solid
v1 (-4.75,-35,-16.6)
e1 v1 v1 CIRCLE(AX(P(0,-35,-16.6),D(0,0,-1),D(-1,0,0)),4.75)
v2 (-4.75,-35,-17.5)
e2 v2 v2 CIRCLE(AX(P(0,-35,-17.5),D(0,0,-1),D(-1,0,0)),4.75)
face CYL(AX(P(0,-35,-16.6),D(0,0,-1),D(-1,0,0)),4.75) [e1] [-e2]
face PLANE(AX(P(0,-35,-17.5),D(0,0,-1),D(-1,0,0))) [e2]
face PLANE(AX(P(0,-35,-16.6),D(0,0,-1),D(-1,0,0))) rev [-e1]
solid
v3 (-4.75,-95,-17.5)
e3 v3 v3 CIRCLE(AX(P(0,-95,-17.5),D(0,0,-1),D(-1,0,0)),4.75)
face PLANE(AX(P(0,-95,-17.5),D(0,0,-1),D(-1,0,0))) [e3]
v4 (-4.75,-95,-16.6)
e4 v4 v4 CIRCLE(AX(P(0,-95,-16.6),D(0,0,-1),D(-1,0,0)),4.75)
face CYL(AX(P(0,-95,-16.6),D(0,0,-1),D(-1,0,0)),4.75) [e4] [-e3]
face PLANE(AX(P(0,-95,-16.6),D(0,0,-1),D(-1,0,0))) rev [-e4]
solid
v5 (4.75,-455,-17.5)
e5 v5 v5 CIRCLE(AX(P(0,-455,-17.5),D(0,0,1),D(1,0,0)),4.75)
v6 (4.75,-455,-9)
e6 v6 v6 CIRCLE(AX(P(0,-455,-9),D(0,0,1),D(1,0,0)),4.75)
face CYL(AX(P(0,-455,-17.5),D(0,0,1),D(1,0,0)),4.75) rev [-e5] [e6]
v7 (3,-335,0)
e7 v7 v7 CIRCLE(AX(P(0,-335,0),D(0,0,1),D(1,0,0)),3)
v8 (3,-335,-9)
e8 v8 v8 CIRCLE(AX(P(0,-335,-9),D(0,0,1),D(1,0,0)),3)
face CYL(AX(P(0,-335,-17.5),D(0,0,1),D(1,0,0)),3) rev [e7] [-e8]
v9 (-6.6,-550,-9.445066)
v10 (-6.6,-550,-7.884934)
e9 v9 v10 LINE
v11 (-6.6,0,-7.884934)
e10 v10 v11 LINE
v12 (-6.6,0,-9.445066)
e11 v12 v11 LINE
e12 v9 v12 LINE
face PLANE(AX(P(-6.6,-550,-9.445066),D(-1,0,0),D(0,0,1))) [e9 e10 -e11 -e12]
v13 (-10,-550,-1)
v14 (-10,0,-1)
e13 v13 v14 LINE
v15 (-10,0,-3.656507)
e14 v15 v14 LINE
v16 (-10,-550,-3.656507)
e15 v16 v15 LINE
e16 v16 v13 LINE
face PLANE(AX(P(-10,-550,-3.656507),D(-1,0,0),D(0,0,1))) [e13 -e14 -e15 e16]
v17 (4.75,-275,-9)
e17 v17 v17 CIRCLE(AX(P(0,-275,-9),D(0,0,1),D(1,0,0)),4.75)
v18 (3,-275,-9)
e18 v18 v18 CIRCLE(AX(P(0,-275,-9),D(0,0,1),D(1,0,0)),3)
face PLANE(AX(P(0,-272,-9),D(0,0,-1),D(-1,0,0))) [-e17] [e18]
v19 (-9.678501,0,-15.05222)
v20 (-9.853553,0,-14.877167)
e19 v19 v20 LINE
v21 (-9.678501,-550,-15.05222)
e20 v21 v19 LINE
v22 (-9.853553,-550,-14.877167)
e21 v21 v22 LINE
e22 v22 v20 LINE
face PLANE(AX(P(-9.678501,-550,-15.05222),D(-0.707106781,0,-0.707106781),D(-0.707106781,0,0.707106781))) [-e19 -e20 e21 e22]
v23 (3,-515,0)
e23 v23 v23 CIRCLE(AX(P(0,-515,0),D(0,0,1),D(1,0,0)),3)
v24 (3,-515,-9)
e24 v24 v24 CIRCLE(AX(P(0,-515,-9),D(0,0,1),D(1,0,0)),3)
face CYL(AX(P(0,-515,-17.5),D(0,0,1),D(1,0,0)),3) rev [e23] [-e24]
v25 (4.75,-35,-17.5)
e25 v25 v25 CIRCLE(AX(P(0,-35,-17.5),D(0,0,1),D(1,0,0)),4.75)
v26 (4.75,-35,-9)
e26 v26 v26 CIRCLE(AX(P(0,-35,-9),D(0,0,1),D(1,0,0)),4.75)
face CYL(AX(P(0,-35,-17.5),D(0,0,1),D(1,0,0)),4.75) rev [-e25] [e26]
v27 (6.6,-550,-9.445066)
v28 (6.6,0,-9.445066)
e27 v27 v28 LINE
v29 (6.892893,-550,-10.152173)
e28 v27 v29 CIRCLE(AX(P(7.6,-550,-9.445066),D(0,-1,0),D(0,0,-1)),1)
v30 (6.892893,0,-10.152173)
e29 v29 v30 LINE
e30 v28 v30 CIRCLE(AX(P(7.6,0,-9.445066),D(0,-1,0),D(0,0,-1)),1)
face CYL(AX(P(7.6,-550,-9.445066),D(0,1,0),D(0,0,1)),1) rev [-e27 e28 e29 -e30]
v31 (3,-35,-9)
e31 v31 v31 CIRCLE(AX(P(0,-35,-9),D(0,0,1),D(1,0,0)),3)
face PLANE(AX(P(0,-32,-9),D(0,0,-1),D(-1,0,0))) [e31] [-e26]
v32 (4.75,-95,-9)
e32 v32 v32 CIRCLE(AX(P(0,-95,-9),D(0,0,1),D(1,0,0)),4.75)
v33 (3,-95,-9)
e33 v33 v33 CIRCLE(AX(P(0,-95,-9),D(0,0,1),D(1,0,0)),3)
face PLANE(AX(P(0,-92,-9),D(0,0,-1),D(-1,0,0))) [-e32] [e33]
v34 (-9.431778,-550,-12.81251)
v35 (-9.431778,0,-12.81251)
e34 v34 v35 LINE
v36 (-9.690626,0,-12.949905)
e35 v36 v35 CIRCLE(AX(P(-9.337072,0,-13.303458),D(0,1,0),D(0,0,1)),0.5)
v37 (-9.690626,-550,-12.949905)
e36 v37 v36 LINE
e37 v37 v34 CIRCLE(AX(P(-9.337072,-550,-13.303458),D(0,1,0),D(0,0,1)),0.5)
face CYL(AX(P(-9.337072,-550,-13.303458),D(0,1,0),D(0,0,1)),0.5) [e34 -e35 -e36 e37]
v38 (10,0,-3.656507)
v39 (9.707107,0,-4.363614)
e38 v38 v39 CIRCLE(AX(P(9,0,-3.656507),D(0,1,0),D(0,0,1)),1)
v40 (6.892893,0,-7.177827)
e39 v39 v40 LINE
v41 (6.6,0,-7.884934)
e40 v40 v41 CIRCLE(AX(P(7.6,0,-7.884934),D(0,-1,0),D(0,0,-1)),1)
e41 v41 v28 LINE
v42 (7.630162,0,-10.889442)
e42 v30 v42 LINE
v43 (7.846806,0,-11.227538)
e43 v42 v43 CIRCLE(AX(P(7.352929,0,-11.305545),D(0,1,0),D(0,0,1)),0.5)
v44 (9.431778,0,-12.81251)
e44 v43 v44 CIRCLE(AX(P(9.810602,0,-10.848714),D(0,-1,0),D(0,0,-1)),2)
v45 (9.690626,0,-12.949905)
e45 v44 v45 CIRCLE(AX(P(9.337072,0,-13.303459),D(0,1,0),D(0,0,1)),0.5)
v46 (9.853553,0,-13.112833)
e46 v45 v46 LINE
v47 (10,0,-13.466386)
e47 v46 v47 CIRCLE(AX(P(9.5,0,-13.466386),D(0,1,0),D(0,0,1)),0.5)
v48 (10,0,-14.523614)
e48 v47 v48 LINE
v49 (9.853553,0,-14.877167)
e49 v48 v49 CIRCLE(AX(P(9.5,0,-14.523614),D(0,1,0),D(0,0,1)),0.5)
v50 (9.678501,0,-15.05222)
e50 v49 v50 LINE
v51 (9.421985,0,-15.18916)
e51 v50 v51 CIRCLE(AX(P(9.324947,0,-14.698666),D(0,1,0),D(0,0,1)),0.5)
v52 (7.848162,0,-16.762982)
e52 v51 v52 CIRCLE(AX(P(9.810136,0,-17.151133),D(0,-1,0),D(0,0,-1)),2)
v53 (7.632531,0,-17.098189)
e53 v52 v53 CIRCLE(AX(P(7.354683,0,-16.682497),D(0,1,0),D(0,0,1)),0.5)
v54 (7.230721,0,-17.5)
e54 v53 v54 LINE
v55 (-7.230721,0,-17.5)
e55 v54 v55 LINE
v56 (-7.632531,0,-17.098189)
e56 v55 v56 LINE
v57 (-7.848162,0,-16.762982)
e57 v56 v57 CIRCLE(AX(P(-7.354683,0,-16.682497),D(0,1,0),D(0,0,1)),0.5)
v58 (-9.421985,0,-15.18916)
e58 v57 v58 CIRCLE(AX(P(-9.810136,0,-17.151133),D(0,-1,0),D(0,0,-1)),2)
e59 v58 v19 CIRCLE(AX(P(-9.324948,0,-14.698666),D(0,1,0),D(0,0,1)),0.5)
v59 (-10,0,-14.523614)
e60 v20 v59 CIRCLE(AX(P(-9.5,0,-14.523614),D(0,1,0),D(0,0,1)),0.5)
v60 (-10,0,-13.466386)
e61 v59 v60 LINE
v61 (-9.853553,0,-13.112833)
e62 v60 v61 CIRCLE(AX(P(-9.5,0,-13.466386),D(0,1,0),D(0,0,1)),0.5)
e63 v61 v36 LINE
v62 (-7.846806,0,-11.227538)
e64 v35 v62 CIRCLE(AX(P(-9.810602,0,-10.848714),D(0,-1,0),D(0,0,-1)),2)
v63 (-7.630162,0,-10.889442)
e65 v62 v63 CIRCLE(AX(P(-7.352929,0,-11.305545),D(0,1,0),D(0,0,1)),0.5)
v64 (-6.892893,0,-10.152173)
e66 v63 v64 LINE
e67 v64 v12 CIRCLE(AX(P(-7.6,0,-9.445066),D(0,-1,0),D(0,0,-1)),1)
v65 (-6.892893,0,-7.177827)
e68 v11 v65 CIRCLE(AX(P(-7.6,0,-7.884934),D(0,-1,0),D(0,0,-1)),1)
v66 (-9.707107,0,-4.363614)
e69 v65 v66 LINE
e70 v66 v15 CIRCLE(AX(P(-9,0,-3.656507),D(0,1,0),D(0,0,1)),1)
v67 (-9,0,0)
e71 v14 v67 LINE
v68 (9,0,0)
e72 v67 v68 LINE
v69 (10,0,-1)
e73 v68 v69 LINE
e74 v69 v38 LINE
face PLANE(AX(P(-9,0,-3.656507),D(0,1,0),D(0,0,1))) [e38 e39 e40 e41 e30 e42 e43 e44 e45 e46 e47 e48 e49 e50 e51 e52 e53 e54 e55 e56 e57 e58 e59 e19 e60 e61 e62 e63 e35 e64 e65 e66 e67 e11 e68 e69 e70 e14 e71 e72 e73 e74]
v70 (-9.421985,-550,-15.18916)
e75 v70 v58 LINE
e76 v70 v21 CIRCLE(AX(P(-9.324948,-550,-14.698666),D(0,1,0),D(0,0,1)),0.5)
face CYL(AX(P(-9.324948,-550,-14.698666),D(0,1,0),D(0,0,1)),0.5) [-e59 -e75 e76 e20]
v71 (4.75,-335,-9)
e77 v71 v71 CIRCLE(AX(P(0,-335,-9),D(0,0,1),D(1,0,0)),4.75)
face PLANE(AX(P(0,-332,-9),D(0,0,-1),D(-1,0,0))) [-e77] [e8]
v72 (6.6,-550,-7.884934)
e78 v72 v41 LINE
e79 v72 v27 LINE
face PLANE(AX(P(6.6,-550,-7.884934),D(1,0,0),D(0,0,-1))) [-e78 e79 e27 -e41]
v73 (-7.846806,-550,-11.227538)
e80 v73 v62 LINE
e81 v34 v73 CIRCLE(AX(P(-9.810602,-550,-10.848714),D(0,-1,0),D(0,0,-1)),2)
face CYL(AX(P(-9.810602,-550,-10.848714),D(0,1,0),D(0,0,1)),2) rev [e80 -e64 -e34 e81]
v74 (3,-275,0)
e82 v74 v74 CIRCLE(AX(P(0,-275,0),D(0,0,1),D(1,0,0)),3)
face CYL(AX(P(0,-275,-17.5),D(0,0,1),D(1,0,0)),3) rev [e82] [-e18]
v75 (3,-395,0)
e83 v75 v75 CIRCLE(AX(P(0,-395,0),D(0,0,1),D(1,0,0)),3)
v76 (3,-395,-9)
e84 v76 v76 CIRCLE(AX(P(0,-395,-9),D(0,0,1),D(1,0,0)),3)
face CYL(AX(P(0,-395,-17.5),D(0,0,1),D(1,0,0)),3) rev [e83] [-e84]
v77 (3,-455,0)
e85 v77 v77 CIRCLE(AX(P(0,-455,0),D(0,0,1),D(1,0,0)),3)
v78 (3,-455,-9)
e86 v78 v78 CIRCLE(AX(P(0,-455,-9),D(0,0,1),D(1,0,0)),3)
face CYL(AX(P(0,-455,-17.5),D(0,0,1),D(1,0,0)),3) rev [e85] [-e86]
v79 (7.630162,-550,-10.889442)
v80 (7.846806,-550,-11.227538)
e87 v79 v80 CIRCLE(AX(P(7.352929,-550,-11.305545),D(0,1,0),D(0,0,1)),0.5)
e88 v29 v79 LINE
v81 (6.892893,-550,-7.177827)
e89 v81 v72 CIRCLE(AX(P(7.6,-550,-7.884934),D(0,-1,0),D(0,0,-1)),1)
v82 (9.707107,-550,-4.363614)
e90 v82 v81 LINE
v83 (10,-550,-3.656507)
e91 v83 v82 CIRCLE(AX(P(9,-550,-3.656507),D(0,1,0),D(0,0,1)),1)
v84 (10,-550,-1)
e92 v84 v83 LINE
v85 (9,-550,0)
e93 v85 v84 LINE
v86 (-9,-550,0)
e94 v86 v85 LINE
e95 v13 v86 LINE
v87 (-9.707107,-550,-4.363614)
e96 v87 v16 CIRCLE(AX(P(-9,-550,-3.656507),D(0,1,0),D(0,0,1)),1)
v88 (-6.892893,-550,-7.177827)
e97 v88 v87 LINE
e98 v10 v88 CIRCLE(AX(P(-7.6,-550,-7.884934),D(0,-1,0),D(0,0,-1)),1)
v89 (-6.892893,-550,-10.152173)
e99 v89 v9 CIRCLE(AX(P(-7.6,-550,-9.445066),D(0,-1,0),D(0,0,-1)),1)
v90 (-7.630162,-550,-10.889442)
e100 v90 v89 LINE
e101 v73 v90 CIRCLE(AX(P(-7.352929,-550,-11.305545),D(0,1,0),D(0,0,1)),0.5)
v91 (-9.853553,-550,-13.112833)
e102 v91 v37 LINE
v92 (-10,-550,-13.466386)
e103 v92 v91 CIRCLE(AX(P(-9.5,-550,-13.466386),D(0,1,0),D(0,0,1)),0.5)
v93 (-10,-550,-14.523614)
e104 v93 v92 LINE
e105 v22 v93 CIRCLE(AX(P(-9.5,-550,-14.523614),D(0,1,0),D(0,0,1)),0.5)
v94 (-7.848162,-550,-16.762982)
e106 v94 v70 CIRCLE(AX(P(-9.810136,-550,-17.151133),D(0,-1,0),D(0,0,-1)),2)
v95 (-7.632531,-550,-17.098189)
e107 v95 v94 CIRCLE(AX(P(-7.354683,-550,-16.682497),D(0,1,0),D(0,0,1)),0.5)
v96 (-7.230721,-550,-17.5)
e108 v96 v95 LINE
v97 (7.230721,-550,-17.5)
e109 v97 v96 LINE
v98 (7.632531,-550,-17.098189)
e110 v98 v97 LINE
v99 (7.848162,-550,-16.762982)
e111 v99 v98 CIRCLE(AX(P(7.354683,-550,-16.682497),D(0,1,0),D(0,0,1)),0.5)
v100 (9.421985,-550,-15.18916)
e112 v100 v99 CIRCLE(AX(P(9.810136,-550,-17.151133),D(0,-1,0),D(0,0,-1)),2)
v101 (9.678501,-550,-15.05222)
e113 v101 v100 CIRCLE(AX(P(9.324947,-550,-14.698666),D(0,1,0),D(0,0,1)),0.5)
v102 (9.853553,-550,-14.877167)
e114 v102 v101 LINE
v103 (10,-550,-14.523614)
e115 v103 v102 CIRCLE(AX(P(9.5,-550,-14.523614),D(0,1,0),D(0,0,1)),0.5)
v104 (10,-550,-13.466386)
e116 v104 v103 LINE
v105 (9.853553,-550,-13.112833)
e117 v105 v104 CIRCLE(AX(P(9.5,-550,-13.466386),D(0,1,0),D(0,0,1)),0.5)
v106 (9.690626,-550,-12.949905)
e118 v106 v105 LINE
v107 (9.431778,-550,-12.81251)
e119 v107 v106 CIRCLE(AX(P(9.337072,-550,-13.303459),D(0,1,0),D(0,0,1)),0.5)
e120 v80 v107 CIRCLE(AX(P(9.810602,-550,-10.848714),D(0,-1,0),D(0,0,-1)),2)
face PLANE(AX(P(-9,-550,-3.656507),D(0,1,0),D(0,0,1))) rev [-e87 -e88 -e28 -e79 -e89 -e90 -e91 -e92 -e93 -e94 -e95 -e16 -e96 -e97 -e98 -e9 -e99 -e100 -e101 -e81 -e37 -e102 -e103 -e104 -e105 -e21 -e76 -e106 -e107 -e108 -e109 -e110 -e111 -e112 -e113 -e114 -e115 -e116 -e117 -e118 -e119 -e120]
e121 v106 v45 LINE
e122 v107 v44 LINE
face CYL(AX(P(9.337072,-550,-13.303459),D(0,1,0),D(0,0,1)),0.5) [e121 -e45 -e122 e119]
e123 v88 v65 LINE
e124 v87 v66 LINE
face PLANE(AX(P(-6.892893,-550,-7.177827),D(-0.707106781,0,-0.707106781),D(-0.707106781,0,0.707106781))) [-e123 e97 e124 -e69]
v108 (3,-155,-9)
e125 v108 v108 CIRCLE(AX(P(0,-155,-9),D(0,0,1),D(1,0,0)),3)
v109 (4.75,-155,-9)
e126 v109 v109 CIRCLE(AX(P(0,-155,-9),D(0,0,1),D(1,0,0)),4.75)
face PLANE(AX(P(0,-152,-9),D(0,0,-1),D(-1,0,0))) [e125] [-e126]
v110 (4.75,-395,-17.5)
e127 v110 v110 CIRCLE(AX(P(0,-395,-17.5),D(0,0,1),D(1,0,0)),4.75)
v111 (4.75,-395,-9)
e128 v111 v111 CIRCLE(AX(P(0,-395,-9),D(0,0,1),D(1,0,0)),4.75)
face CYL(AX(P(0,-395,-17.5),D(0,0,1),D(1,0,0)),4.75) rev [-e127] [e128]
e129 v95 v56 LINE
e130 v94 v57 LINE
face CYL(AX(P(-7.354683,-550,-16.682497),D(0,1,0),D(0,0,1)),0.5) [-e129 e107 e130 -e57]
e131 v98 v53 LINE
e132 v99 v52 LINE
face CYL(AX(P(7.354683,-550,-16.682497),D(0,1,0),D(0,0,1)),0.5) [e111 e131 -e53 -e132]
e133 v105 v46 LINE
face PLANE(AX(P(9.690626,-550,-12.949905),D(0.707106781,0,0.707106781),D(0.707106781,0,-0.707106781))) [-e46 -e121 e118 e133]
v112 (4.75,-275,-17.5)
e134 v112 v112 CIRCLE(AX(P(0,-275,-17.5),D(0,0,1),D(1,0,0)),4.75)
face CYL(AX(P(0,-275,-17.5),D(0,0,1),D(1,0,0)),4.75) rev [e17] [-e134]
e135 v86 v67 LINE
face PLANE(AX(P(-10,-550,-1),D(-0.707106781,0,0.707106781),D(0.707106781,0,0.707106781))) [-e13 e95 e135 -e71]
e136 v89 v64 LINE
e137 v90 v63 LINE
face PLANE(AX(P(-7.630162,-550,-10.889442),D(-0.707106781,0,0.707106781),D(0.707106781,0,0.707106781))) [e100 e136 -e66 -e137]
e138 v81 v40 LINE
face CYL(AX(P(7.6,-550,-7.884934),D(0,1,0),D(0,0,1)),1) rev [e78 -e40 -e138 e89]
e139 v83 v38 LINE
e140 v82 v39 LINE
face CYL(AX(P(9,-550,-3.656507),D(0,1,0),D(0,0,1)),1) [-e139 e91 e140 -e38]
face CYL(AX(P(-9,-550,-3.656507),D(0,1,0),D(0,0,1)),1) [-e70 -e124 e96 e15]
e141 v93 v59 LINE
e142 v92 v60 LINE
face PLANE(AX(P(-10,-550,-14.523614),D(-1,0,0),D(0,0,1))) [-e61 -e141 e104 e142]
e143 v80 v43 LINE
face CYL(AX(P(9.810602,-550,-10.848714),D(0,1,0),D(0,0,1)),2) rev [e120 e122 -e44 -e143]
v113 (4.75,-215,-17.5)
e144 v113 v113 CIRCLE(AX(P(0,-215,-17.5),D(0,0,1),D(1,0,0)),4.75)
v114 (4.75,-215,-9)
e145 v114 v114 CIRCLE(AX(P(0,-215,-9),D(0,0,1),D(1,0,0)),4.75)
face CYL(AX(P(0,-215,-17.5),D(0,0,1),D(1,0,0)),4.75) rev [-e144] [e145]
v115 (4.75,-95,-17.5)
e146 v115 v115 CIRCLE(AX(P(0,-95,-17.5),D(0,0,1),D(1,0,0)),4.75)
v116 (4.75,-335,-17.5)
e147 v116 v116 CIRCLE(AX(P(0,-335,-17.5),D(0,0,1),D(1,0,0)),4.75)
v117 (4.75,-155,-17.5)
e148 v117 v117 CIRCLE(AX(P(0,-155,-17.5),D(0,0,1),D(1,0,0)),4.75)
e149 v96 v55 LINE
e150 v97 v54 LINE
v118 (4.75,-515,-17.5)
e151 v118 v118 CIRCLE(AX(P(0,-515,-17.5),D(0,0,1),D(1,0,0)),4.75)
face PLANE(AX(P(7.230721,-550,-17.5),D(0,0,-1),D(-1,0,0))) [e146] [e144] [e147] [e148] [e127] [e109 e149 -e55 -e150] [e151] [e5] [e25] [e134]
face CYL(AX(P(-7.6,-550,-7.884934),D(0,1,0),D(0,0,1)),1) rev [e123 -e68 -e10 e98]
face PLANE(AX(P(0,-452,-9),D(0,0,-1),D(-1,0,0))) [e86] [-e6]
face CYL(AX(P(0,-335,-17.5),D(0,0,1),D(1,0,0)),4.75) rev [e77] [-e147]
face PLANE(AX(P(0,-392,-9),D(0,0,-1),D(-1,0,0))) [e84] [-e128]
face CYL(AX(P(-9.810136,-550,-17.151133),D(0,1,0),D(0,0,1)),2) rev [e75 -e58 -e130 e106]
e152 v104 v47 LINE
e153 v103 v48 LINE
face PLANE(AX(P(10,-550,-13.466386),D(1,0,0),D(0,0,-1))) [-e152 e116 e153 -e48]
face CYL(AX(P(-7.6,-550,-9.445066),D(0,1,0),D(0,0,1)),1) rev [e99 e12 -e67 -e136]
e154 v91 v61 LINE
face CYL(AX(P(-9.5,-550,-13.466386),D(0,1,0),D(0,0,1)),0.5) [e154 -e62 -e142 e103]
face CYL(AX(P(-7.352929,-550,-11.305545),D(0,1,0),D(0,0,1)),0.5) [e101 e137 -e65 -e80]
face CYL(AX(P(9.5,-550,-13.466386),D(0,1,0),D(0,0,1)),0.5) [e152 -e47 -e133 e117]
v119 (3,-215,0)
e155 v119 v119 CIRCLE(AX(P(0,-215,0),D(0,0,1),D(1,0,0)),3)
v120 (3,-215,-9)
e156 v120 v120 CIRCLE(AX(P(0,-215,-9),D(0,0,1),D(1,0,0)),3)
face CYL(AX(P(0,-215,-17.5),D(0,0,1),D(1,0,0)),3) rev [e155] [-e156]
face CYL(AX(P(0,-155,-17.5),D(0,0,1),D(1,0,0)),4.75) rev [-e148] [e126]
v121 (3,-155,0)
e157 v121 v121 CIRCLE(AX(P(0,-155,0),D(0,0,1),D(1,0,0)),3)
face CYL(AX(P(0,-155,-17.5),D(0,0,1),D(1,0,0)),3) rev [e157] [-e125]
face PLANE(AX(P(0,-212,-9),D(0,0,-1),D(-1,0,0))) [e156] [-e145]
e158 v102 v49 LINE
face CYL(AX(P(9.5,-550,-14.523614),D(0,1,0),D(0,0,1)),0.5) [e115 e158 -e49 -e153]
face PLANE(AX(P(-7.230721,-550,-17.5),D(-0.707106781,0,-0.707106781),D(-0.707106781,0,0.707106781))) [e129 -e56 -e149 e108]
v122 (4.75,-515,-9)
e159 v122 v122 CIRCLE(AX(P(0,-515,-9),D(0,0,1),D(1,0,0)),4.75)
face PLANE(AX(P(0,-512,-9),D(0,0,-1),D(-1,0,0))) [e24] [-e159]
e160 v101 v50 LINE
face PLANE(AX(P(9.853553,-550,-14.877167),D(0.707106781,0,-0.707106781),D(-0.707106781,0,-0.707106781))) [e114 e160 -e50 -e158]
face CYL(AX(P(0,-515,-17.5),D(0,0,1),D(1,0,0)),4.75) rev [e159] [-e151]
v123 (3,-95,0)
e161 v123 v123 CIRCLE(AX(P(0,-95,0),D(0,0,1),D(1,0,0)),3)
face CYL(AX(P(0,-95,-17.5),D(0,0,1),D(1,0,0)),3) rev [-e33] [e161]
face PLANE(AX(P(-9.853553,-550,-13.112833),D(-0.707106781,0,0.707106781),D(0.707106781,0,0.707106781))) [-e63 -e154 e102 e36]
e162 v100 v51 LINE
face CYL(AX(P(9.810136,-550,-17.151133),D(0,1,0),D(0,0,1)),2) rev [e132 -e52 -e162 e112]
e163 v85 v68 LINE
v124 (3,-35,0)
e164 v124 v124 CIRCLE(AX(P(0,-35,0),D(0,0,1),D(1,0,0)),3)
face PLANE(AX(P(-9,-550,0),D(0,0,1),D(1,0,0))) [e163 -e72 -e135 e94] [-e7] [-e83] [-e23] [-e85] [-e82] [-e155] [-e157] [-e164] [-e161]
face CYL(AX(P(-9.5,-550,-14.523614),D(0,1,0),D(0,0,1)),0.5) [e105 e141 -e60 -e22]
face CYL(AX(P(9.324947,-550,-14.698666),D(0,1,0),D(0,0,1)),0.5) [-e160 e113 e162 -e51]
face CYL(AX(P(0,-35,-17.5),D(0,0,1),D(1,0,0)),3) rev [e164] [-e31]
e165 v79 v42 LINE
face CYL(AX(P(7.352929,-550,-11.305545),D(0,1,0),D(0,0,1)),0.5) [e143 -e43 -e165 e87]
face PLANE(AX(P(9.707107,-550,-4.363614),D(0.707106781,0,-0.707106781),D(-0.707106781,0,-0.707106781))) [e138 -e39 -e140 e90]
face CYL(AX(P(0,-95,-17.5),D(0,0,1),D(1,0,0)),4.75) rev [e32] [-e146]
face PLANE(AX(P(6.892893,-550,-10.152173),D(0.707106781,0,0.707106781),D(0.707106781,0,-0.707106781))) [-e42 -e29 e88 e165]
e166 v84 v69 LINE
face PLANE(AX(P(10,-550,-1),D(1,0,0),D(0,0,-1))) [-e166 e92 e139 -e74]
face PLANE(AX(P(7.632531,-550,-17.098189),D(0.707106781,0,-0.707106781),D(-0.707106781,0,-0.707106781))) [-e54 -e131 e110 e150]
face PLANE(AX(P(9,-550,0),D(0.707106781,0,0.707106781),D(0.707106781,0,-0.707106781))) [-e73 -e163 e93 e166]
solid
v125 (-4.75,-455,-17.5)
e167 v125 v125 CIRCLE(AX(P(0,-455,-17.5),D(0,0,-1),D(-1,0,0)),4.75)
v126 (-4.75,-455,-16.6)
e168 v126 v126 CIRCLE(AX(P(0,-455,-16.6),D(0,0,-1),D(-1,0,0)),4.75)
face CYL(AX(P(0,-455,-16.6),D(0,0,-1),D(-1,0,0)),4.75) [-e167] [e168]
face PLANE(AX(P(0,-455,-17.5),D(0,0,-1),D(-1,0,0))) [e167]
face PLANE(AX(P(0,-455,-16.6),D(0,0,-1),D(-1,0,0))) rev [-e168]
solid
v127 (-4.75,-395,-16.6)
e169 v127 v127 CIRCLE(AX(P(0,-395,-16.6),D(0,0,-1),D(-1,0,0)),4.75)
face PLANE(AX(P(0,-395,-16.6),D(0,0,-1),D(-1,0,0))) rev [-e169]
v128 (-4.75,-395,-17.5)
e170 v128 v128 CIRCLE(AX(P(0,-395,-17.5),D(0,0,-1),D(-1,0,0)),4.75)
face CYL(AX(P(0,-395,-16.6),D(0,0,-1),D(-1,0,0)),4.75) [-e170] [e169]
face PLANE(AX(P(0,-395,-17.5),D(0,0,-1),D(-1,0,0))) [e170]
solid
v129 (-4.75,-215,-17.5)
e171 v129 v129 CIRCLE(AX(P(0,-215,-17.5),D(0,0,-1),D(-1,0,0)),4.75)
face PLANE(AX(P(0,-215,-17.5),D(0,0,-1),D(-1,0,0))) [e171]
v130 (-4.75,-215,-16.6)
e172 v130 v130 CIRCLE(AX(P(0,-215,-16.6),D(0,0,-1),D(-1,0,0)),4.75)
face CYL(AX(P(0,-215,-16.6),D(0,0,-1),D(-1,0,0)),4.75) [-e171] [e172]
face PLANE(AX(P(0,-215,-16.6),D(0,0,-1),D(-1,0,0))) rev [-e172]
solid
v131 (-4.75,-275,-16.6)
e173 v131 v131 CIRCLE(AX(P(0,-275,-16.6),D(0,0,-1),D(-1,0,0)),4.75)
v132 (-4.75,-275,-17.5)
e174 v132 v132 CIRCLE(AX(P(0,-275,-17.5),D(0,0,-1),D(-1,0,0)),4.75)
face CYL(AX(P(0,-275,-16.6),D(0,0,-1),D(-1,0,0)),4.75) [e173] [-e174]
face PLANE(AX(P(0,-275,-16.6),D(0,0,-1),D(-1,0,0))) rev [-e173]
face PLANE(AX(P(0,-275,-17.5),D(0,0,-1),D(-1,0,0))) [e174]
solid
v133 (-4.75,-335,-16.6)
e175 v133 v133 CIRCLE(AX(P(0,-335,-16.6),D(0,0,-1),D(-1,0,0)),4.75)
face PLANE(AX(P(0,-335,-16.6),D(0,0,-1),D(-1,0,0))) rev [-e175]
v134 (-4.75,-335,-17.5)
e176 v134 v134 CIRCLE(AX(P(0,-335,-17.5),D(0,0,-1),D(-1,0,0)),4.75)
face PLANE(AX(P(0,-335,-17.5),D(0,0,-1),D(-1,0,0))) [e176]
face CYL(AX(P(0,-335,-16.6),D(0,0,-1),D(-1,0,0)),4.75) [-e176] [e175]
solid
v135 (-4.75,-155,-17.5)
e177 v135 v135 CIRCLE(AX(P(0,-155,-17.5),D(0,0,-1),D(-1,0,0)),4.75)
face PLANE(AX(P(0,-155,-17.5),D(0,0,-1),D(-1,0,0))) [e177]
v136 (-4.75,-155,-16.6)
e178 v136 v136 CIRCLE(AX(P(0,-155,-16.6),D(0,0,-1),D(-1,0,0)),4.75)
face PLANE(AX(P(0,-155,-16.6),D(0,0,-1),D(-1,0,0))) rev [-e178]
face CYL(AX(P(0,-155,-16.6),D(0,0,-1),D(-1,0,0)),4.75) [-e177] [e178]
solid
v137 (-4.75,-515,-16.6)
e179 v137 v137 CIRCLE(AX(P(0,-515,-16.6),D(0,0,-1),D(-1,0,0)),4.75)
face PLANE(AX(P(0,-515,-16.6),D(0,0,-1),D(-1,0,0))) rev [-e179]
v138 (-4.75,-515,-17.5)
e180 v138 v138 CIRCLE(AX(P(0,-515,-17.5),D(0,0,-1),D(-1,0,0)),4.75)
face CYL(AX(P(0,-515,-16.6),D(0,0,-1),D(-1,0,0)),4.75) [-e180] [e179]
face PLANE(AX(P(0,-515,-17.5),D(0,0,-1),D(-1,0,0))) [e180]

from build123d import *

# Parameters (mm, degrees)
EXTRUDE_1_DEPTH               = 550
SKETCH_80_R                   = 4.75
EXTRUDE_12_DEPTH              = 0.9
PATTERN_START                 = -17.499999985
PATTERN_LINEAR_1_OUTLINE_R    = 4.75
PATTERN_LINEAR_1_DEPTH        = 0.9
PATTERN_LINEAR_1_2_OUTLINE_R  = 4.75
PATTERN_LINEAR_1_2_DEPTH      = 0.9
PATTERN_LINEAR_1_3_OUTLINE_R  = 4.75
PATTERN_LINEAR_1_3_DEPTH      = 0.9
PATTERN_LINEAR_1_4_OUTLINE_R  = 4.75
PATTERN_LINEAR_1_4_DEPTH      = 0.9
PATTERN_LINEAR_1_5_OUTLINE_R  = 4.75
PATTERN_LINEAR_1_5_DEPTH      = 0.9
PATTERN_LINEAR_1_6_OUTLINE_R  = 4.75
PATTERN_LINEAR_1_6_DEPTH      = 0.9
PATTERN_LINEAR_1_7_OUTLINE_R  = 4.75
PATTERN_LINEAR_1_7_DEPTH      = 0.9
PATTERN_LINEAR_1_8_OUTLINE_R  = 4.75
PATTERN_LINEAR_1_8_DEPTH      = 0.9
PATTERN_LINEAR_1_9_OUTLINE_R  = 4.75
PATTERN_LINEAR_1_9_DEPTH      = 8.499999985
PATTERN_START_2               = -9
PATTERN_LINEAR_1_10_OUTLINE_R = 3
PATTERN_LINEAR_1_10_DEPTH     = 9


# Read off the part's stored shape, not the designer's step: Линейный массив1
with BuildPart() as part:
    # Эскиз1 → Бобышка-Вытянуть1 (new body)
    with BuildSketch(Plane(origin=(0, 0, 0), x_dir=(1, 0, 0), z_dir=(0, 1, 0))):
        with BuildLine():
            Line((-10, 3.656507036), (-10, 1))
            Line((-10, 1), (-9, 0))
            Line((-9, 0), (9, 0))
            Line((9, 0), (10, 1))
            Line((10, 1), (10, 3.656507036))
            ThreePointArc((10, 3.656507036), (9.92387953, 4.039190479), (9.707106773, 4.363613837))
            Line((9.707106773, 4.363613837), (6.892893227, 7.177827383))
            ThreePointArc((6.892893227, 7.177827383), (6.67612047, 7.502250741), (6.6, 7.884934184))
            Line((6.6, 7.884934184), (6.6, 9.445065806))
            ThreePointArc((6.6, 9.445065806), (6.67612047, 9.827749249), (6.892893227, 10.152172607))
            Line((6.892893227, 10.152172607), (7.63016236, 10.88944174))
            ThreePointArc((7.63016236, 10.88944174), (7.773916172, 11.035785914), (7.84680643, 11.2275378))
            ThreePointArc((7.84680643, 11.2275378), (8.39638832, 12.26292769), (9.431778202, 12.812509595))
            ThreePointArc((9.431778202, 12.812509595), (9.571493891, 12.861817755), (9.690625709, 12.949905089))
            Line((9.690625709, 12.949905089), (9.85355341, 13.11283279))
            ThreePointArc((9.85355341, 13.11283279), (9.961939771, 13.275044443), (10, 13.466386134))
            Line((10, 13.466386134), (10, 14.523613836))
            ThreePointArc((10, 14.523613836), (9.961939771, 14.714955527), (9.85355341, 14.87716718))
            Line((9.85355341, 14.87716718), (9.678500897, 15.052219693))
            ThreePointArc((9.678500897, 15.052219693), (9.560417661, 15.139748844), (9.421985093, 15.189159641))
            ThreePointArc((9.421985093, 15.189159641), (8.395921978, 15.736919382), (7.84816224, 16.7629825))
            ThreePointArc((7.84816224, 16.7629825), (7.775191486, 16.953000828), (7.632531165, 17.098189425))
            Line((7.632531165, 17.098189425), (7.230720605, 17.499999985))
            Line((7.230720605, 17.499999985), (-7.230720615, 17.499999985))
            Line((-7.230720615, 17.499999985), (-7.632531175, 17.098189425))
            ThreePointArc((-7.632531175, 17.098189425), (-7.775191503, 16.953000832), (-7.84816225, 16.7629825))
            ThreePointArc((-7.84816225, 16.7629825), (-8.395921997, 15.736919373), (-9.421985128, 15.189159636))
            ThreePointArc((-9.421985128, 15.189159636), (-9.560417671, 15.13974885), (-9.678500884, 15.052219716))
            Line((-9.678500884, 15.052219716), (-9.85355341, 14.87716719))
            ThreePointArc((-9.85355341, 14.87716719), (-9.961939771, 14.714955537), (-10, 14.523613846))
            Line((-10, 14.523613846), (-10, 13.466386134))
            ThreePointArc((-10, 13.466386134), (-9.961939771, 13.275044443), (-9.85355341, 13.11283279))
            Line((-9.85355341, 13.11283279), (-9.690625667, 12.949905047))
            ThreePointArc((-9.690625667, 12.949905047), (-9.57149389, 12.861817745), (-9.431778248, 12.812509604))
            ThreePointArc((-9.431778248, 12.812509604), (-8.396388337, 12.262927707), (-7.84680643, 11.2275378))
            ThreePointArc((-7.84680643, 11.2275378), (-7.773916168, 11.035785916), (-7.63016236, 10.88944174))
            Line((-7.63016236, 10.88944174), (-6.892893227, 10.152172607))
            ThreePointArc((-6.892893227, 10.152172607), (-6.67612047, 9.827749249), (-6.6, 9.445065806))
            Line((-6.6, 9.445065806), (-6.6, 7.884934184))
            ThreePointArc((-6.6, 7.884934184), (-6.67612047, 7.502250741), (-6.892893227, 7.177827383))
            Line((-6.892893227, 7.177827383), (-9.707106773, 4.363613837))
            ThreePointArc((-9.707106773, 4.363613837), (-9.92387953, 4.039190479), (-10, 3.656507036))
        make_face()
    extrude(amount=-EXTRUDE_1_DEPTH)

    # Эскиз6 → Вырез-Повернуть1 (revolve, cut)
    with BuildSketch(Plane(origin=(0, 30, 0), x_dir=(0, -1, 0), z_dir=(1, 0, 0)), mode=Mode.PRIVATE) as cut_revolve_1_sk:
        Polygon((60.25, 17.499999985), (65, 17.499999985), (65, 0), (62, 0), (62, 9), (60.25, 9), align=None)
    revolve(cut_revolve_1_sk.sketch.rotate(Axis((0, -35, -17.499999985), (0, 0, 1)), 270), axis=Axis((0, -35, -17.499999985), (0, 0, 1)), mode=Mode.SUBTRACT)

    # Pattern Linear 1 9 outline → Pattern Linear 1 9 (cut)
    with BuildSketch(Plane.XY.offset(PATTERN_START)):
        with Locations((0, -95)):
            Circle(PATTERN_LINEAR_1_9_OUTLINE_R)
        with Locations((0, -155)):
            Circle(PATTERN_LINEAR_1_9_OUTLINE_R)
        with Locations((0, -215)):
            Circle(PATTERN_LINEAR_1_9_OUTLINE_R)
        with Locations((0, -275)):
            Circle(PATTERN_LINEAR_1_9_OUTLINE_R)
        with Locations((0, -335)):
            Circle(PATTERN_LINEAR_1_9_OUTLINE_R)
        with Locations((0, -395)):
            Circle(PATTERN_LINEAR_1_9_OUTLINE_R)
        with Locations((0, -455)):
            Circle(PATTERN_LINEAR_1_9_OUTLINE_R)
        with Locations((0, -515)):
            Circle(PATTERN_LINEAR_1_9_OUTLINE_R)
    extrude(amount=PATTERN_LINEAR_1_9_DEPTH, mode=Mode.SUBTRACT)

    # Pattern Linear 1 10 outline → Pattern Linear 1 10 (cut)
    with BuildSketch(Plane.XY.offset(PATTERN_START_2)):
        with Locations((0, -95)):
            Circle(PATTERN_LINEAR_1_10_OUTLINE_R)
        with Locations((0, -155)):
            Circle(PATTERN_LINEAR_1_10_OUTLINE_R)
        with Locations((0, -215)):
            Circle(PATTERN_LINEAR_1_10_OUTLINE_R)
        with Locations((0, -275)):
            Circle(PATTERN_LINEAR_1_10_OUTLINE_R)
        with Locations((0, -335)):
            Circle(PATTERN_LINEAR_1_10_OUTLINE_R)
        with Locations((0, -395)):
            Circle(PATTERN_LINEAR_1_10_OUTLINE_R)
        with Locations((0, -455)):
            Circle(PATTERN_LINEAR_1_10_OUTLINE_R)
        with Locations((0, -515)):
            Circle(PATTERN_LINEAR_1_10_OUTLINE_R)
    extrude(amount=PATTERN_LINEAR_1_10_DEPTH, mode=Mode.SUBTRACT)


with BuildPart() as body_2:
    # Эскиз80 → Бобышка-Вытянуть12 (new body)
    with BuildSketch(Plane(origin=(0, 0, -17.499999985), x_dir=(-1, 0, 0), z_dir=(0, 0, -1))):
        with Locations((0, -35)):
            Circle(SKETCH_80_R)
    extrude(amount=-EXTRUDE_12_DEPTH)


with BuildPart() as body_3:
    # Линейный массив1 outline → Линейный массив1 (new body)
    with BuildSketch(Plane.XY.offset(PATTERN_START)):
        with Locations((0, -515)):
            Circle(PATTERN_LINEAR_1_OUTLINE_R)
    extrude(amount=PATTERN_LINEAR_1_DEPTH)


with BuildPart() as body_4:
    # Pattern Linear 1 2 outline → Pattern Linear 1 2 (new body)
    with BuildSketch(Plane.XY.offset(PATTERN_START)):
        with Locations((0, -455)):
            Circle(PATTERN_LINEAR_1_2_OUTLINE_R)
    extrude(amount=PATTERN_LINEAR_1_2_DEPTH)


with BuildPart() as body_5:
    # Pattern Linear 1 3 outline → Pattern Linear 1 3 (new body)
    with BuildSketch(Plane.XY.offset(PATTERN_START)):
        with Locations((0, -395)):
            Circle(PATTERN_LINEAR_1_3_OUTLINE_R)
    extrude(amount=PATTERN_LINEAR_1_3_DEPTH)


with BuildPart() as body_6:
    # Pattern Linear 1 4 outline → Pattern Linear 1 4 (new body)
    with BuildSketch(Plane.XY.offset(PATTERN_START)):
        with Locations((0, -335)):
            Circle(PATTERN_LINEAR_1_4_OUTLINE_R)
    extrude(amount=PATTERN_LINEAR_1_4_DEPTH)


with BuildPart() as body_7:
    # Pattern Linear 1 5 outline → Pattern Linear 1 5 (new body)
    with BuildSketch(Plane.XY.offset(PATTERN_START)):
        with Locations((0, -275)):
            Circle(PATTERN_LINEAR_1_5_OUTLINE_R)
    extrude(amount=PATTERN_LINEAR_1_5_DEPTH)


with BuildPart() as body_8:
    # Pattern Linear 1 6 outline → Pattern Linear 1 6 (new body)
    with BuildSketch(Plane.XY.offset(PATTERN_START)):
        with Locations((0, -215)):
            Circle(PATTERN_LINEAR_1_6_OUTLINE_R)
    extrude(amount=PATTERN_LINEAR_1_6_DEPTH)


with BuildPart() as body_9:
    # Pattern Linear 1 7 outline → Pattern Linear 1 7 (new body)
    with BuildSketch(Plane.XY.offset(PATTERN_START)):
        with Locations((0, -155)):
            Circle(PATTERN_LINEAR_1_7_OUTLINE_R)
    extrude(amount=PATTERN_LINEAR_1_7_DEPTH)


with BuildPart() as body_10:
    # Pattern Linear 1 8 outline → Pattern Linear 1 8 (new body)
    with BuildSketch(Plane.XY.offset(PATTERN_START)):
        with Locations((0, -95)):
            Circle(PATTERN_LINEAR_1_8_OUTLINE_R)
    extrude(amount=PATTERN_LINEAR_1_8_DEPTH)


solid = Compound([part.part, body_2.part, body_3.part, body_4.part, body_5.part, body_6.part, body_7.part, body_8.part, body_9.part, body_10.part])
